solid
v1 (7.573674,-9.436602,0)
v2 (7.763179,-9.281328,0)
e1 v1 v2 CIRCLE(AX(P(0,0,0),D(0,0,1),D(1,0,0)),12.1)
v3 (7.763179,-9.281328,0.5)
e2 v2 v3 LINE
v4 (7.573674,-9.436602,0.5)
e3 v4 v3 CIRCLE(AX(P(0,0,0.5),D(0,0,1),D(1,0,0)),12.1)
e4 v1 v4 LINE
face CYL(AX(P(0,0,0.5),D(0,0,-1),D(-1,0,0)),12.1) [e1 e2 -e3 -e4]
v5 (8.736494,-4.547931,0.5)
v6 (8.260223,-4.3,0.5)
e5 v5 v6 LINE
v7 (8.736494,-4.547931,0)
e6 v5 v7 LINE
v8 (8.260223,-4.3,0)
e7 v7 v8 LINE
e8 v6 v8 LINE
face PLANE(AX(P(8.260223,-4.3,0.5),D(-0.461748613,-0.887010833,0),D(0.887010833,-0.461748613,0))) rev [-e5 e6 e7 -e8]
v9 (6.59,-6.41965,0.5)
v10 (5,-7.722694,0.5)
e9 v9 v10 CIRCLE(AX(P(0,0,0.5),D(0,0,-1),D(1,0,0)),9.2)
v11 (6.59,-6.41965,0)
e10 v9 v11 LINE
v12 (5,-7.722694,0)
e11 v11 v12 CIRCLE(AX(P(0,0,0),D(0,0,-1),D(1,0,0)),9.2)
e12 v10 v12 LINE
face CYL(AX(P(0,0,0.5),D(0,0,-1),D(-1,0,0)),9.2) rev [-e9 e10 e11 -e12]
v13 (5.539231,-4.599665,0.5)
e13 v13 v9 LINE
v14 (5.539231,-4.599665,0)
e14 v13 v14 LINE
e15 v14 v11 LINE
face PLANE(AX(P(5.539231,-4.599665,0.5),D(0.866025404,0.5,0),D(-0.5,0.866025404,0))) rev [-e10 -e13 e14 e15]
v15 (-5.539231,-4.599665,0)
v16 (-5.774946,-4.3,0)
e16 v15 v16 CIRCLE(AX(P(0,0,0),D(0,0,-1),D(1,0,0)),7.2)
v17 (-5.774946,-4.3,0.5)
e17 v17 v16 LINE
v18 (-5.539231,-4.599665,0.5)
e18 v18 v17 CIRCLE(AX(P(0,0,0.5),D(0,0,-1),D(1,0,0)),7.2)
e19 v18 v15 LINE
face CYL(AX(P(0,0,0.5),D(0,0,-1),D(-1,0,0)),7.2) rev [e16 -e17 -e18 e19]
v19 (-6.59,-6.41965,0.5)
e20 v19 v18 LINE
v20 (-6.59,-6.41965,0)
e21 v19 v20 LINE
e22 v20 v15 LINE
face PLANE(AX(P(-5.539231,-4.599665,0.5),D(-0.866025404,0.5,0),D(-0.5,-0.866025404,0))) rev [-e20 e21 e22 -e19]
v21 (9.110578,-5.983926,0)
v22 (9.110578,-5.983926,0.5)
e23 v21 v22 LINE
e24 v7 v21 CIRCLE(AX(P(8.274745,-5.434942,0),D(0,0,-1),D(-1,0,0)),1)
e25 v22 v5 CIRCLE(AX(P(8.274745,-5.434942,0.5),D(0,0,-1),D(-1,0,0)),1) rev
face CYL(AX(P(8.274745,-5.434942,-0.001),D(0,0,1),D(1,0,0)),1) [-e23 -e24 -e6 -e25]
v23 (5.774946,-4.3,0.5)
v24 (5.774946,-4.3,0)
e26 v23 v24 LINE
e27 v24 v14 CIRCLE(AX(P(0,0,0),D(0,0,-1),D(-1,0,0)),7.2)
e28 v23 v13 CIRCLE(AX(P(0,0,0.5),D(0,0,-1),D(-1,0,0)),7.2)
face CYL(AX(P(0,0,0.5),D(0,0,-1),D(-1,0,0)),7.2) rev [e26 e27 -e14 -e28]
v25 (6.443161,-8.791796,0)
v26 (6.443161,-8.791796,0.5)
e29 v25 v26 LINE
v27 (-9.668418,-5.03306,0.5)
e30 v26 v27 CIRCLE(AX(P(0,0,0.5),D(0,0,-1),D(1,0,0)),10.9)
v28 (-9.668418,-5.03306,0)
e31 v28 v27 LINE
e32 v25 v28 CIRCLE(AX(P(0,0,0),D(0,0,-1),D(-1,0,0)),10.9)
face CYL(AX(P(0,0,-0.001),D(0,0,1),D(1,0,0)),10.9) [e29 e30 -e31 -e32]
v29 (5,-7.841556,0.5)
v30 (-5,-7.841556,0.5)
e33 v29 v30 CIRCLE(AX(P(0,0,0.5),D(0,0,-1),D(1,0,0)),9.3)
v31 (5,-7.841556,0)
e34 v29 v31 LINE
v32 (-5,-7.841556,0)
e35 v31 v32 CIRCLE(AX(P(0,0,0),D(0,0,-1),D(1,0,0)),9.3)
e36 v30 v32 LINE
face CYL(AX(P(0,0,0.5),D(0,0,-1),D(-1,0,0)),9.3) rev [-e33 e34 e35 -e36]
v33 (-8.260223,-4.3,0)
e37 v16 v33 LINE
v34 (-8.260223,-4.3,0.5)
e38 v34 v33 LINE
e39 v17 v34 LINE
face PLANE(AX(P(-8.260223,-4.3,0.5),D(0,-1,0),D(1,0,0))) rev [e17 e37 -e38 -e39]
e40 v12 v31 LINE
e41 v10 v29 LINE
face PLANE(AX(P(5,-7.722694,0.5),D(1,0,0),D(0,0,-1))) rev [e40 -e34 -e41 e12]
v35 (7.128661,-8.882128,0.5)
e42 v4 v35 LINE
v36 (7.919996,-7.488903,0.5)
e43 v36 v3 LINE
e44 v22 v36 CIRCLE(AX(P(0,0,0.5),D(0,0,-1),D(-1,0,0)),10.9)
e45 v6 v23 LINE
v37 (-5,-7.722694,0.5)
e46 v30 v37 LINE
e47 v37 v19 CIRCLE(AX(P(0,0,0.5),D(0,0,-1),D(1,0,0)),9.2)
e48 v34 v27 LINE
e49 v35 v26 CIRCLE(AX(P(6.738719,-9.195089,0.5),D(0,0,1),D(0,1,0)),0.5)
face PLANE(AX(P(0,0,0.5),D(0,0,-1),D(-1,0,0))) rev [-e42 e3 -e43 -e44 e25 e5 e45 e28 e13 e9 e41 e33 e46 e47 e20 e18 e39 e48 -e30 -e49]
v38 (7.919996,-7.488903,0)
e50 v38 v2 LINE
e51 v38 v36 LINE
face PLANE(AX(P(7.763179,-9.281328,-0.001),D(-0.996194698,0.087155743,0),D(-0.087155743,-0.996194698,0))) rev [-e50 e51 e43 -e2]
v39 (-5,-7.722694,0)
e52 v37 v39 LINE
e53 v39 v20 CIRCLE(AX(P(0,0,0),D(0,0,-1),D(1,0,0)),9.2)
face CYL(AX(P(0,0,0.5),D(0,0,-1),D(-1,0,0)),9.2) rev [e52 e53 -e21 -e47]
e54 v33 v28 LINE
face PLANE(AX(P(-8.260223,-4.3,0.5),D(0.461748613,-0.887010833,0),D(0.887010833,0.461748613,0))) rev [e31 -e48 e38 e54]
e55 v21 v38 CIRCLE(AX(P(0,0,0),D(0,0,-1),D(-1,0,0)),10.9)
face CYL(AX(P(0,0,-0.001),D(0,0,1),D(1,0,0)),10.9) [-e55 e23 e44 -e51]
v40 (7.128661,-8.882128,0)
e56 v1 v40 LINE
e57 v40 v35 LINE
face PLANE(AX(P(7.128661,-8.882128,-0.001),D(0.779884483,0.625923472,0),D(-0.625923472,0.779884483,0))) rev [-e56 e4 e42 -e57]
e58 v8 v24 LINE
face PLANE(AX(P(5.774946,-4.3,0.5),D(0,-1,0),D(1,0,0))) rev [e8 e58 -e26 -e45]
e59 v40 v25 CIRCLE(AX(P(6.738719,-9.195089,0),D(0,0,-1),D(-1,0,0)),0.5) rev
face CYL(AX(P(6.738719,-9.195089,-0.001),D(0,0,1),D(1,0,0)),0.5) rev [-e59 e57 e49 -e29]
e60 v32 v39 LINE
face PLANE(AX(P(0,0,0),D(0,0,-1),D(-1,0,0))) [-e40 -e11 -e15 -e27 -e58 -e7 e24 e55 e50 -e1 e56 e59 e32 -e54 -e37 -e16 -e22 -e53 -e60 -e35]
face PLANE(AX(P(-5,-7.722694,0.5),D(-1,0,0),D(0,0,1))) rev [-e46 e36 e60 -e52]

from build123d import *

# Parameters (mm, degrees)
OTHER_10076_5_DEPTH = 0.5
CUT_EXTRUDE1_START  = -0.5
CUT_EXTRUDE1_DEPTH  = 0.5


# Read off the part's stored shape, not the designer's step: 10076-5
with BuildPart() as part:
    # Other 10076-5 outline → Other 10076-5 (new body)
    with BuildSketch(Plane.XY):
        with BuildLine():
            ThreePointArc((7.573674013, -9.436602245), (7.668819519, -9.359444812), (7.763179028, -9.281328104))
            Line((7.763179028, -9.281328104), (7.919995926, -7.488902759))
            ThreePointArc((7.919995926, -7.488902759), (8.548470738, -6.76266575), (9.110578105, -5.983925684))
            ThreePointArc((9.110578105, -5.983925684), (9.242448569, -5.182849851), (8.736493865, -4.547930843))
            Line((8.736493865, -4.547930843), (8.260223146, -4.3))
            Line((8.260223146, -4.3), (5.774945887, -4.3))
            ThreePointArc((5.774945887, -4.3), (5.659072475, -4.451392897), (5.53923133, -4.5996648))
            Line((5.53923133, -4.5996648), (6.59, -6.419649523))
            ThreePointArc((6.59, -6.419649523), (5.831509763, -7.1157216), (5, -7.722693831))
            Line((5, -7.722693831), (5, -7.841555968))
            ThreePointArc((5, -7.841555968), (0, -9.3), (-5, -7.841555968))
            Line((-5, -7.841555968), (-5, -7.722693831))
            ThreePointArc((-5, -7.722693831), (-5.831509763, -7.1157216), (-6.59, -6.419649523))
            Line((-6.59, -6.419649523), (-5.53923133, -4.5996648))
            ThreePointArc((-5.53923133, -4.5996648), (-5.659072475, -4.451392897), (-5.774945887, -4.3))
            Line((-5.774945887, -4.3), (-8.260223146, -4.3))
            Line((-8.260223146, -4.3), (-10.732831081, -5.58715822))
            ThreePointArc((-10.732831081, -5.58715822), (-10.675718173, -5.6955282), (-10.617511084, -5.803314431))
            Line((-10.617511084, -5.803314431), (-9.055174855, -6.258693914))
            ThreePointArc((-9.055174855, -6.258693914), (-8.704696722, -6.64117368), (-8.882127626, -7.128661083))
            Line((-8.882127626, -7.128661083), (-9.436602245, -7.573674013))
            ThreePointArc((-9.436602245, -7.573674013), (-9.359444812, -7.668819519), (-9.281328104, -7.763179028))
            Line((-9.281328104, -7.763179028), (-7.660171598, -7.905011844))
            ThreePointArc((-7.660171598, -7.905011844), (-7.241809703, -8.211767477), (-7.320727248, -8.724502998))
            Line((-7.320727248, -8.724502998), (-7.777730077, -9.269137762))
            ThreePointArc((-7.777730077, -9.269137762), (-7.683493234, -9.347402405), (-7.588468891, -9.424709008))
            Line((-7.588468891, -9.424709008), (-5.970792243, -9.247544602))
            ThreePointArc((-5.970792243, -9.247544602), (-5.500623999, -9.466787654), (-5.477995427, -9.985067155))
            Line((-5.477995427, -9.985067155), (-5.819964104, -10.608393744))
            ThreePointArc((-5.819964104, -10.608393744), (-5.712269322, -10.666769858), (-5.603989074, -10.724052707))
            Line((-5.603989074, -10.724052707), (-4.05195869, -10.234699407))
            ThreePointArc((-4.05195869, -10.234699407), (-3.548052399, -10.358004491), (-3.424747314, -10.861910782))
            Line((-3.424747314, -10.861910782), (-3.638540174, -11.539975104))
            ThreePointArc((-3.638540174, -11.539975104), (-3.521526102, -11.576219327), (-3.404151099, -11.611277074))
            Line((-3.404151099, -11.611277074), (-1.977410637, -10.828540453))
            ThreePointArc((-1.977410637, -10.828540453), (-1.459131136, -10.851169025), (-1.239888083, -11.321337268))
            Line((-1.239888083, -11.321337268), (-1.317289186, -12.028081692))
            ThreePointArc((-1.317289186, -12.028081692), (-1.195452609, -12.04080118), (-1.073493507, -12.052286575))
            Line((-1.073493507, -12.052286575), (0.173128198, -11.006246762))
            ThreePointArc((0.173128198, -11.006246762), (0.685863719, -10.927329218), (0.992619352, -11.345691113))
            Line((0.992619352, -11.345691113), (1.054584487, -12.053955847))
            ThreePointArc((1.054584487, -12.053955847), (1.176561457, -12.042661796), (1.298417839, -12.030133462))
            Line((1.298417839, -12.030133462), (2.317013814, -10.760989181))
            ThreePointArc((2.317013814, -10.760989181), (2.804501216, -10.583558277), (3.186980982, -10.93403641))
            Line((3.186980982, -10.93403641), (3.38593107, -11.616603238))
            ThreePointArc((3.38593107, -11.616603238), (3.503360927, -11.581729673), (3.620431715, -11.545669067))
            Line((3.620431715, -11.545669067), (4.371857887, -10.10219282))
            ThreePointArc((4.371857887, -10.10219282), (4.815363304, -9.833067127), (5.258868721, -10.10219282))
            Line((5.258868721, -10.10219282), (5.58715822, -10.732831081))
            ThreePointArc((5.58715822, -10.732831081), (5.6955282, -10.675718173), (5.803314431, -10.617511084))
            Line((5.803314431, -10.617511084), (6.258693914, -9.055174855))
            ThreePointArc((6.258693914, -9.055174855), (6.64117368, -8.704696722), (7.128661083, -8.882127626))
            Line((7.128661083, -8.882127626), (7.573674013, -9.436602245))
        make_face()
    extrude(amount=OTHER_10076_5_DEPTH)

    # Sketch1 → Cut-Extrude1 (cut)
    with BuildSketch(Plane.XY.offset(0.5).offset(CUT_EXTRUDE1_START)):
        with BuildLine():
            Line((-9.668418082, -5.033059884), (-10.732831081, -5.58715822))
            ThreePointArc((-10.732831081, -5.58715822), (-3.521526102, -11.576219327), (5.803314431, -10.617511084))
            Line((5.803314431, -10.617511084), (6.258693914, -9.055174855))
            ThreePointArc((6.258693914, -9.055174855), (6.329177308, -8.908251896), (6.443160998, -8.791795969))
            ThreePointArc((6.443160998, -8.791795969), (-2.476407691, -10.614961373), (-9.668418082, -5.033059884))
        make_face()
    extrude(amount=CUT_EXTRUDE1_DEPTH, mode=Mode.SUBTRACT)


solid = part.part
